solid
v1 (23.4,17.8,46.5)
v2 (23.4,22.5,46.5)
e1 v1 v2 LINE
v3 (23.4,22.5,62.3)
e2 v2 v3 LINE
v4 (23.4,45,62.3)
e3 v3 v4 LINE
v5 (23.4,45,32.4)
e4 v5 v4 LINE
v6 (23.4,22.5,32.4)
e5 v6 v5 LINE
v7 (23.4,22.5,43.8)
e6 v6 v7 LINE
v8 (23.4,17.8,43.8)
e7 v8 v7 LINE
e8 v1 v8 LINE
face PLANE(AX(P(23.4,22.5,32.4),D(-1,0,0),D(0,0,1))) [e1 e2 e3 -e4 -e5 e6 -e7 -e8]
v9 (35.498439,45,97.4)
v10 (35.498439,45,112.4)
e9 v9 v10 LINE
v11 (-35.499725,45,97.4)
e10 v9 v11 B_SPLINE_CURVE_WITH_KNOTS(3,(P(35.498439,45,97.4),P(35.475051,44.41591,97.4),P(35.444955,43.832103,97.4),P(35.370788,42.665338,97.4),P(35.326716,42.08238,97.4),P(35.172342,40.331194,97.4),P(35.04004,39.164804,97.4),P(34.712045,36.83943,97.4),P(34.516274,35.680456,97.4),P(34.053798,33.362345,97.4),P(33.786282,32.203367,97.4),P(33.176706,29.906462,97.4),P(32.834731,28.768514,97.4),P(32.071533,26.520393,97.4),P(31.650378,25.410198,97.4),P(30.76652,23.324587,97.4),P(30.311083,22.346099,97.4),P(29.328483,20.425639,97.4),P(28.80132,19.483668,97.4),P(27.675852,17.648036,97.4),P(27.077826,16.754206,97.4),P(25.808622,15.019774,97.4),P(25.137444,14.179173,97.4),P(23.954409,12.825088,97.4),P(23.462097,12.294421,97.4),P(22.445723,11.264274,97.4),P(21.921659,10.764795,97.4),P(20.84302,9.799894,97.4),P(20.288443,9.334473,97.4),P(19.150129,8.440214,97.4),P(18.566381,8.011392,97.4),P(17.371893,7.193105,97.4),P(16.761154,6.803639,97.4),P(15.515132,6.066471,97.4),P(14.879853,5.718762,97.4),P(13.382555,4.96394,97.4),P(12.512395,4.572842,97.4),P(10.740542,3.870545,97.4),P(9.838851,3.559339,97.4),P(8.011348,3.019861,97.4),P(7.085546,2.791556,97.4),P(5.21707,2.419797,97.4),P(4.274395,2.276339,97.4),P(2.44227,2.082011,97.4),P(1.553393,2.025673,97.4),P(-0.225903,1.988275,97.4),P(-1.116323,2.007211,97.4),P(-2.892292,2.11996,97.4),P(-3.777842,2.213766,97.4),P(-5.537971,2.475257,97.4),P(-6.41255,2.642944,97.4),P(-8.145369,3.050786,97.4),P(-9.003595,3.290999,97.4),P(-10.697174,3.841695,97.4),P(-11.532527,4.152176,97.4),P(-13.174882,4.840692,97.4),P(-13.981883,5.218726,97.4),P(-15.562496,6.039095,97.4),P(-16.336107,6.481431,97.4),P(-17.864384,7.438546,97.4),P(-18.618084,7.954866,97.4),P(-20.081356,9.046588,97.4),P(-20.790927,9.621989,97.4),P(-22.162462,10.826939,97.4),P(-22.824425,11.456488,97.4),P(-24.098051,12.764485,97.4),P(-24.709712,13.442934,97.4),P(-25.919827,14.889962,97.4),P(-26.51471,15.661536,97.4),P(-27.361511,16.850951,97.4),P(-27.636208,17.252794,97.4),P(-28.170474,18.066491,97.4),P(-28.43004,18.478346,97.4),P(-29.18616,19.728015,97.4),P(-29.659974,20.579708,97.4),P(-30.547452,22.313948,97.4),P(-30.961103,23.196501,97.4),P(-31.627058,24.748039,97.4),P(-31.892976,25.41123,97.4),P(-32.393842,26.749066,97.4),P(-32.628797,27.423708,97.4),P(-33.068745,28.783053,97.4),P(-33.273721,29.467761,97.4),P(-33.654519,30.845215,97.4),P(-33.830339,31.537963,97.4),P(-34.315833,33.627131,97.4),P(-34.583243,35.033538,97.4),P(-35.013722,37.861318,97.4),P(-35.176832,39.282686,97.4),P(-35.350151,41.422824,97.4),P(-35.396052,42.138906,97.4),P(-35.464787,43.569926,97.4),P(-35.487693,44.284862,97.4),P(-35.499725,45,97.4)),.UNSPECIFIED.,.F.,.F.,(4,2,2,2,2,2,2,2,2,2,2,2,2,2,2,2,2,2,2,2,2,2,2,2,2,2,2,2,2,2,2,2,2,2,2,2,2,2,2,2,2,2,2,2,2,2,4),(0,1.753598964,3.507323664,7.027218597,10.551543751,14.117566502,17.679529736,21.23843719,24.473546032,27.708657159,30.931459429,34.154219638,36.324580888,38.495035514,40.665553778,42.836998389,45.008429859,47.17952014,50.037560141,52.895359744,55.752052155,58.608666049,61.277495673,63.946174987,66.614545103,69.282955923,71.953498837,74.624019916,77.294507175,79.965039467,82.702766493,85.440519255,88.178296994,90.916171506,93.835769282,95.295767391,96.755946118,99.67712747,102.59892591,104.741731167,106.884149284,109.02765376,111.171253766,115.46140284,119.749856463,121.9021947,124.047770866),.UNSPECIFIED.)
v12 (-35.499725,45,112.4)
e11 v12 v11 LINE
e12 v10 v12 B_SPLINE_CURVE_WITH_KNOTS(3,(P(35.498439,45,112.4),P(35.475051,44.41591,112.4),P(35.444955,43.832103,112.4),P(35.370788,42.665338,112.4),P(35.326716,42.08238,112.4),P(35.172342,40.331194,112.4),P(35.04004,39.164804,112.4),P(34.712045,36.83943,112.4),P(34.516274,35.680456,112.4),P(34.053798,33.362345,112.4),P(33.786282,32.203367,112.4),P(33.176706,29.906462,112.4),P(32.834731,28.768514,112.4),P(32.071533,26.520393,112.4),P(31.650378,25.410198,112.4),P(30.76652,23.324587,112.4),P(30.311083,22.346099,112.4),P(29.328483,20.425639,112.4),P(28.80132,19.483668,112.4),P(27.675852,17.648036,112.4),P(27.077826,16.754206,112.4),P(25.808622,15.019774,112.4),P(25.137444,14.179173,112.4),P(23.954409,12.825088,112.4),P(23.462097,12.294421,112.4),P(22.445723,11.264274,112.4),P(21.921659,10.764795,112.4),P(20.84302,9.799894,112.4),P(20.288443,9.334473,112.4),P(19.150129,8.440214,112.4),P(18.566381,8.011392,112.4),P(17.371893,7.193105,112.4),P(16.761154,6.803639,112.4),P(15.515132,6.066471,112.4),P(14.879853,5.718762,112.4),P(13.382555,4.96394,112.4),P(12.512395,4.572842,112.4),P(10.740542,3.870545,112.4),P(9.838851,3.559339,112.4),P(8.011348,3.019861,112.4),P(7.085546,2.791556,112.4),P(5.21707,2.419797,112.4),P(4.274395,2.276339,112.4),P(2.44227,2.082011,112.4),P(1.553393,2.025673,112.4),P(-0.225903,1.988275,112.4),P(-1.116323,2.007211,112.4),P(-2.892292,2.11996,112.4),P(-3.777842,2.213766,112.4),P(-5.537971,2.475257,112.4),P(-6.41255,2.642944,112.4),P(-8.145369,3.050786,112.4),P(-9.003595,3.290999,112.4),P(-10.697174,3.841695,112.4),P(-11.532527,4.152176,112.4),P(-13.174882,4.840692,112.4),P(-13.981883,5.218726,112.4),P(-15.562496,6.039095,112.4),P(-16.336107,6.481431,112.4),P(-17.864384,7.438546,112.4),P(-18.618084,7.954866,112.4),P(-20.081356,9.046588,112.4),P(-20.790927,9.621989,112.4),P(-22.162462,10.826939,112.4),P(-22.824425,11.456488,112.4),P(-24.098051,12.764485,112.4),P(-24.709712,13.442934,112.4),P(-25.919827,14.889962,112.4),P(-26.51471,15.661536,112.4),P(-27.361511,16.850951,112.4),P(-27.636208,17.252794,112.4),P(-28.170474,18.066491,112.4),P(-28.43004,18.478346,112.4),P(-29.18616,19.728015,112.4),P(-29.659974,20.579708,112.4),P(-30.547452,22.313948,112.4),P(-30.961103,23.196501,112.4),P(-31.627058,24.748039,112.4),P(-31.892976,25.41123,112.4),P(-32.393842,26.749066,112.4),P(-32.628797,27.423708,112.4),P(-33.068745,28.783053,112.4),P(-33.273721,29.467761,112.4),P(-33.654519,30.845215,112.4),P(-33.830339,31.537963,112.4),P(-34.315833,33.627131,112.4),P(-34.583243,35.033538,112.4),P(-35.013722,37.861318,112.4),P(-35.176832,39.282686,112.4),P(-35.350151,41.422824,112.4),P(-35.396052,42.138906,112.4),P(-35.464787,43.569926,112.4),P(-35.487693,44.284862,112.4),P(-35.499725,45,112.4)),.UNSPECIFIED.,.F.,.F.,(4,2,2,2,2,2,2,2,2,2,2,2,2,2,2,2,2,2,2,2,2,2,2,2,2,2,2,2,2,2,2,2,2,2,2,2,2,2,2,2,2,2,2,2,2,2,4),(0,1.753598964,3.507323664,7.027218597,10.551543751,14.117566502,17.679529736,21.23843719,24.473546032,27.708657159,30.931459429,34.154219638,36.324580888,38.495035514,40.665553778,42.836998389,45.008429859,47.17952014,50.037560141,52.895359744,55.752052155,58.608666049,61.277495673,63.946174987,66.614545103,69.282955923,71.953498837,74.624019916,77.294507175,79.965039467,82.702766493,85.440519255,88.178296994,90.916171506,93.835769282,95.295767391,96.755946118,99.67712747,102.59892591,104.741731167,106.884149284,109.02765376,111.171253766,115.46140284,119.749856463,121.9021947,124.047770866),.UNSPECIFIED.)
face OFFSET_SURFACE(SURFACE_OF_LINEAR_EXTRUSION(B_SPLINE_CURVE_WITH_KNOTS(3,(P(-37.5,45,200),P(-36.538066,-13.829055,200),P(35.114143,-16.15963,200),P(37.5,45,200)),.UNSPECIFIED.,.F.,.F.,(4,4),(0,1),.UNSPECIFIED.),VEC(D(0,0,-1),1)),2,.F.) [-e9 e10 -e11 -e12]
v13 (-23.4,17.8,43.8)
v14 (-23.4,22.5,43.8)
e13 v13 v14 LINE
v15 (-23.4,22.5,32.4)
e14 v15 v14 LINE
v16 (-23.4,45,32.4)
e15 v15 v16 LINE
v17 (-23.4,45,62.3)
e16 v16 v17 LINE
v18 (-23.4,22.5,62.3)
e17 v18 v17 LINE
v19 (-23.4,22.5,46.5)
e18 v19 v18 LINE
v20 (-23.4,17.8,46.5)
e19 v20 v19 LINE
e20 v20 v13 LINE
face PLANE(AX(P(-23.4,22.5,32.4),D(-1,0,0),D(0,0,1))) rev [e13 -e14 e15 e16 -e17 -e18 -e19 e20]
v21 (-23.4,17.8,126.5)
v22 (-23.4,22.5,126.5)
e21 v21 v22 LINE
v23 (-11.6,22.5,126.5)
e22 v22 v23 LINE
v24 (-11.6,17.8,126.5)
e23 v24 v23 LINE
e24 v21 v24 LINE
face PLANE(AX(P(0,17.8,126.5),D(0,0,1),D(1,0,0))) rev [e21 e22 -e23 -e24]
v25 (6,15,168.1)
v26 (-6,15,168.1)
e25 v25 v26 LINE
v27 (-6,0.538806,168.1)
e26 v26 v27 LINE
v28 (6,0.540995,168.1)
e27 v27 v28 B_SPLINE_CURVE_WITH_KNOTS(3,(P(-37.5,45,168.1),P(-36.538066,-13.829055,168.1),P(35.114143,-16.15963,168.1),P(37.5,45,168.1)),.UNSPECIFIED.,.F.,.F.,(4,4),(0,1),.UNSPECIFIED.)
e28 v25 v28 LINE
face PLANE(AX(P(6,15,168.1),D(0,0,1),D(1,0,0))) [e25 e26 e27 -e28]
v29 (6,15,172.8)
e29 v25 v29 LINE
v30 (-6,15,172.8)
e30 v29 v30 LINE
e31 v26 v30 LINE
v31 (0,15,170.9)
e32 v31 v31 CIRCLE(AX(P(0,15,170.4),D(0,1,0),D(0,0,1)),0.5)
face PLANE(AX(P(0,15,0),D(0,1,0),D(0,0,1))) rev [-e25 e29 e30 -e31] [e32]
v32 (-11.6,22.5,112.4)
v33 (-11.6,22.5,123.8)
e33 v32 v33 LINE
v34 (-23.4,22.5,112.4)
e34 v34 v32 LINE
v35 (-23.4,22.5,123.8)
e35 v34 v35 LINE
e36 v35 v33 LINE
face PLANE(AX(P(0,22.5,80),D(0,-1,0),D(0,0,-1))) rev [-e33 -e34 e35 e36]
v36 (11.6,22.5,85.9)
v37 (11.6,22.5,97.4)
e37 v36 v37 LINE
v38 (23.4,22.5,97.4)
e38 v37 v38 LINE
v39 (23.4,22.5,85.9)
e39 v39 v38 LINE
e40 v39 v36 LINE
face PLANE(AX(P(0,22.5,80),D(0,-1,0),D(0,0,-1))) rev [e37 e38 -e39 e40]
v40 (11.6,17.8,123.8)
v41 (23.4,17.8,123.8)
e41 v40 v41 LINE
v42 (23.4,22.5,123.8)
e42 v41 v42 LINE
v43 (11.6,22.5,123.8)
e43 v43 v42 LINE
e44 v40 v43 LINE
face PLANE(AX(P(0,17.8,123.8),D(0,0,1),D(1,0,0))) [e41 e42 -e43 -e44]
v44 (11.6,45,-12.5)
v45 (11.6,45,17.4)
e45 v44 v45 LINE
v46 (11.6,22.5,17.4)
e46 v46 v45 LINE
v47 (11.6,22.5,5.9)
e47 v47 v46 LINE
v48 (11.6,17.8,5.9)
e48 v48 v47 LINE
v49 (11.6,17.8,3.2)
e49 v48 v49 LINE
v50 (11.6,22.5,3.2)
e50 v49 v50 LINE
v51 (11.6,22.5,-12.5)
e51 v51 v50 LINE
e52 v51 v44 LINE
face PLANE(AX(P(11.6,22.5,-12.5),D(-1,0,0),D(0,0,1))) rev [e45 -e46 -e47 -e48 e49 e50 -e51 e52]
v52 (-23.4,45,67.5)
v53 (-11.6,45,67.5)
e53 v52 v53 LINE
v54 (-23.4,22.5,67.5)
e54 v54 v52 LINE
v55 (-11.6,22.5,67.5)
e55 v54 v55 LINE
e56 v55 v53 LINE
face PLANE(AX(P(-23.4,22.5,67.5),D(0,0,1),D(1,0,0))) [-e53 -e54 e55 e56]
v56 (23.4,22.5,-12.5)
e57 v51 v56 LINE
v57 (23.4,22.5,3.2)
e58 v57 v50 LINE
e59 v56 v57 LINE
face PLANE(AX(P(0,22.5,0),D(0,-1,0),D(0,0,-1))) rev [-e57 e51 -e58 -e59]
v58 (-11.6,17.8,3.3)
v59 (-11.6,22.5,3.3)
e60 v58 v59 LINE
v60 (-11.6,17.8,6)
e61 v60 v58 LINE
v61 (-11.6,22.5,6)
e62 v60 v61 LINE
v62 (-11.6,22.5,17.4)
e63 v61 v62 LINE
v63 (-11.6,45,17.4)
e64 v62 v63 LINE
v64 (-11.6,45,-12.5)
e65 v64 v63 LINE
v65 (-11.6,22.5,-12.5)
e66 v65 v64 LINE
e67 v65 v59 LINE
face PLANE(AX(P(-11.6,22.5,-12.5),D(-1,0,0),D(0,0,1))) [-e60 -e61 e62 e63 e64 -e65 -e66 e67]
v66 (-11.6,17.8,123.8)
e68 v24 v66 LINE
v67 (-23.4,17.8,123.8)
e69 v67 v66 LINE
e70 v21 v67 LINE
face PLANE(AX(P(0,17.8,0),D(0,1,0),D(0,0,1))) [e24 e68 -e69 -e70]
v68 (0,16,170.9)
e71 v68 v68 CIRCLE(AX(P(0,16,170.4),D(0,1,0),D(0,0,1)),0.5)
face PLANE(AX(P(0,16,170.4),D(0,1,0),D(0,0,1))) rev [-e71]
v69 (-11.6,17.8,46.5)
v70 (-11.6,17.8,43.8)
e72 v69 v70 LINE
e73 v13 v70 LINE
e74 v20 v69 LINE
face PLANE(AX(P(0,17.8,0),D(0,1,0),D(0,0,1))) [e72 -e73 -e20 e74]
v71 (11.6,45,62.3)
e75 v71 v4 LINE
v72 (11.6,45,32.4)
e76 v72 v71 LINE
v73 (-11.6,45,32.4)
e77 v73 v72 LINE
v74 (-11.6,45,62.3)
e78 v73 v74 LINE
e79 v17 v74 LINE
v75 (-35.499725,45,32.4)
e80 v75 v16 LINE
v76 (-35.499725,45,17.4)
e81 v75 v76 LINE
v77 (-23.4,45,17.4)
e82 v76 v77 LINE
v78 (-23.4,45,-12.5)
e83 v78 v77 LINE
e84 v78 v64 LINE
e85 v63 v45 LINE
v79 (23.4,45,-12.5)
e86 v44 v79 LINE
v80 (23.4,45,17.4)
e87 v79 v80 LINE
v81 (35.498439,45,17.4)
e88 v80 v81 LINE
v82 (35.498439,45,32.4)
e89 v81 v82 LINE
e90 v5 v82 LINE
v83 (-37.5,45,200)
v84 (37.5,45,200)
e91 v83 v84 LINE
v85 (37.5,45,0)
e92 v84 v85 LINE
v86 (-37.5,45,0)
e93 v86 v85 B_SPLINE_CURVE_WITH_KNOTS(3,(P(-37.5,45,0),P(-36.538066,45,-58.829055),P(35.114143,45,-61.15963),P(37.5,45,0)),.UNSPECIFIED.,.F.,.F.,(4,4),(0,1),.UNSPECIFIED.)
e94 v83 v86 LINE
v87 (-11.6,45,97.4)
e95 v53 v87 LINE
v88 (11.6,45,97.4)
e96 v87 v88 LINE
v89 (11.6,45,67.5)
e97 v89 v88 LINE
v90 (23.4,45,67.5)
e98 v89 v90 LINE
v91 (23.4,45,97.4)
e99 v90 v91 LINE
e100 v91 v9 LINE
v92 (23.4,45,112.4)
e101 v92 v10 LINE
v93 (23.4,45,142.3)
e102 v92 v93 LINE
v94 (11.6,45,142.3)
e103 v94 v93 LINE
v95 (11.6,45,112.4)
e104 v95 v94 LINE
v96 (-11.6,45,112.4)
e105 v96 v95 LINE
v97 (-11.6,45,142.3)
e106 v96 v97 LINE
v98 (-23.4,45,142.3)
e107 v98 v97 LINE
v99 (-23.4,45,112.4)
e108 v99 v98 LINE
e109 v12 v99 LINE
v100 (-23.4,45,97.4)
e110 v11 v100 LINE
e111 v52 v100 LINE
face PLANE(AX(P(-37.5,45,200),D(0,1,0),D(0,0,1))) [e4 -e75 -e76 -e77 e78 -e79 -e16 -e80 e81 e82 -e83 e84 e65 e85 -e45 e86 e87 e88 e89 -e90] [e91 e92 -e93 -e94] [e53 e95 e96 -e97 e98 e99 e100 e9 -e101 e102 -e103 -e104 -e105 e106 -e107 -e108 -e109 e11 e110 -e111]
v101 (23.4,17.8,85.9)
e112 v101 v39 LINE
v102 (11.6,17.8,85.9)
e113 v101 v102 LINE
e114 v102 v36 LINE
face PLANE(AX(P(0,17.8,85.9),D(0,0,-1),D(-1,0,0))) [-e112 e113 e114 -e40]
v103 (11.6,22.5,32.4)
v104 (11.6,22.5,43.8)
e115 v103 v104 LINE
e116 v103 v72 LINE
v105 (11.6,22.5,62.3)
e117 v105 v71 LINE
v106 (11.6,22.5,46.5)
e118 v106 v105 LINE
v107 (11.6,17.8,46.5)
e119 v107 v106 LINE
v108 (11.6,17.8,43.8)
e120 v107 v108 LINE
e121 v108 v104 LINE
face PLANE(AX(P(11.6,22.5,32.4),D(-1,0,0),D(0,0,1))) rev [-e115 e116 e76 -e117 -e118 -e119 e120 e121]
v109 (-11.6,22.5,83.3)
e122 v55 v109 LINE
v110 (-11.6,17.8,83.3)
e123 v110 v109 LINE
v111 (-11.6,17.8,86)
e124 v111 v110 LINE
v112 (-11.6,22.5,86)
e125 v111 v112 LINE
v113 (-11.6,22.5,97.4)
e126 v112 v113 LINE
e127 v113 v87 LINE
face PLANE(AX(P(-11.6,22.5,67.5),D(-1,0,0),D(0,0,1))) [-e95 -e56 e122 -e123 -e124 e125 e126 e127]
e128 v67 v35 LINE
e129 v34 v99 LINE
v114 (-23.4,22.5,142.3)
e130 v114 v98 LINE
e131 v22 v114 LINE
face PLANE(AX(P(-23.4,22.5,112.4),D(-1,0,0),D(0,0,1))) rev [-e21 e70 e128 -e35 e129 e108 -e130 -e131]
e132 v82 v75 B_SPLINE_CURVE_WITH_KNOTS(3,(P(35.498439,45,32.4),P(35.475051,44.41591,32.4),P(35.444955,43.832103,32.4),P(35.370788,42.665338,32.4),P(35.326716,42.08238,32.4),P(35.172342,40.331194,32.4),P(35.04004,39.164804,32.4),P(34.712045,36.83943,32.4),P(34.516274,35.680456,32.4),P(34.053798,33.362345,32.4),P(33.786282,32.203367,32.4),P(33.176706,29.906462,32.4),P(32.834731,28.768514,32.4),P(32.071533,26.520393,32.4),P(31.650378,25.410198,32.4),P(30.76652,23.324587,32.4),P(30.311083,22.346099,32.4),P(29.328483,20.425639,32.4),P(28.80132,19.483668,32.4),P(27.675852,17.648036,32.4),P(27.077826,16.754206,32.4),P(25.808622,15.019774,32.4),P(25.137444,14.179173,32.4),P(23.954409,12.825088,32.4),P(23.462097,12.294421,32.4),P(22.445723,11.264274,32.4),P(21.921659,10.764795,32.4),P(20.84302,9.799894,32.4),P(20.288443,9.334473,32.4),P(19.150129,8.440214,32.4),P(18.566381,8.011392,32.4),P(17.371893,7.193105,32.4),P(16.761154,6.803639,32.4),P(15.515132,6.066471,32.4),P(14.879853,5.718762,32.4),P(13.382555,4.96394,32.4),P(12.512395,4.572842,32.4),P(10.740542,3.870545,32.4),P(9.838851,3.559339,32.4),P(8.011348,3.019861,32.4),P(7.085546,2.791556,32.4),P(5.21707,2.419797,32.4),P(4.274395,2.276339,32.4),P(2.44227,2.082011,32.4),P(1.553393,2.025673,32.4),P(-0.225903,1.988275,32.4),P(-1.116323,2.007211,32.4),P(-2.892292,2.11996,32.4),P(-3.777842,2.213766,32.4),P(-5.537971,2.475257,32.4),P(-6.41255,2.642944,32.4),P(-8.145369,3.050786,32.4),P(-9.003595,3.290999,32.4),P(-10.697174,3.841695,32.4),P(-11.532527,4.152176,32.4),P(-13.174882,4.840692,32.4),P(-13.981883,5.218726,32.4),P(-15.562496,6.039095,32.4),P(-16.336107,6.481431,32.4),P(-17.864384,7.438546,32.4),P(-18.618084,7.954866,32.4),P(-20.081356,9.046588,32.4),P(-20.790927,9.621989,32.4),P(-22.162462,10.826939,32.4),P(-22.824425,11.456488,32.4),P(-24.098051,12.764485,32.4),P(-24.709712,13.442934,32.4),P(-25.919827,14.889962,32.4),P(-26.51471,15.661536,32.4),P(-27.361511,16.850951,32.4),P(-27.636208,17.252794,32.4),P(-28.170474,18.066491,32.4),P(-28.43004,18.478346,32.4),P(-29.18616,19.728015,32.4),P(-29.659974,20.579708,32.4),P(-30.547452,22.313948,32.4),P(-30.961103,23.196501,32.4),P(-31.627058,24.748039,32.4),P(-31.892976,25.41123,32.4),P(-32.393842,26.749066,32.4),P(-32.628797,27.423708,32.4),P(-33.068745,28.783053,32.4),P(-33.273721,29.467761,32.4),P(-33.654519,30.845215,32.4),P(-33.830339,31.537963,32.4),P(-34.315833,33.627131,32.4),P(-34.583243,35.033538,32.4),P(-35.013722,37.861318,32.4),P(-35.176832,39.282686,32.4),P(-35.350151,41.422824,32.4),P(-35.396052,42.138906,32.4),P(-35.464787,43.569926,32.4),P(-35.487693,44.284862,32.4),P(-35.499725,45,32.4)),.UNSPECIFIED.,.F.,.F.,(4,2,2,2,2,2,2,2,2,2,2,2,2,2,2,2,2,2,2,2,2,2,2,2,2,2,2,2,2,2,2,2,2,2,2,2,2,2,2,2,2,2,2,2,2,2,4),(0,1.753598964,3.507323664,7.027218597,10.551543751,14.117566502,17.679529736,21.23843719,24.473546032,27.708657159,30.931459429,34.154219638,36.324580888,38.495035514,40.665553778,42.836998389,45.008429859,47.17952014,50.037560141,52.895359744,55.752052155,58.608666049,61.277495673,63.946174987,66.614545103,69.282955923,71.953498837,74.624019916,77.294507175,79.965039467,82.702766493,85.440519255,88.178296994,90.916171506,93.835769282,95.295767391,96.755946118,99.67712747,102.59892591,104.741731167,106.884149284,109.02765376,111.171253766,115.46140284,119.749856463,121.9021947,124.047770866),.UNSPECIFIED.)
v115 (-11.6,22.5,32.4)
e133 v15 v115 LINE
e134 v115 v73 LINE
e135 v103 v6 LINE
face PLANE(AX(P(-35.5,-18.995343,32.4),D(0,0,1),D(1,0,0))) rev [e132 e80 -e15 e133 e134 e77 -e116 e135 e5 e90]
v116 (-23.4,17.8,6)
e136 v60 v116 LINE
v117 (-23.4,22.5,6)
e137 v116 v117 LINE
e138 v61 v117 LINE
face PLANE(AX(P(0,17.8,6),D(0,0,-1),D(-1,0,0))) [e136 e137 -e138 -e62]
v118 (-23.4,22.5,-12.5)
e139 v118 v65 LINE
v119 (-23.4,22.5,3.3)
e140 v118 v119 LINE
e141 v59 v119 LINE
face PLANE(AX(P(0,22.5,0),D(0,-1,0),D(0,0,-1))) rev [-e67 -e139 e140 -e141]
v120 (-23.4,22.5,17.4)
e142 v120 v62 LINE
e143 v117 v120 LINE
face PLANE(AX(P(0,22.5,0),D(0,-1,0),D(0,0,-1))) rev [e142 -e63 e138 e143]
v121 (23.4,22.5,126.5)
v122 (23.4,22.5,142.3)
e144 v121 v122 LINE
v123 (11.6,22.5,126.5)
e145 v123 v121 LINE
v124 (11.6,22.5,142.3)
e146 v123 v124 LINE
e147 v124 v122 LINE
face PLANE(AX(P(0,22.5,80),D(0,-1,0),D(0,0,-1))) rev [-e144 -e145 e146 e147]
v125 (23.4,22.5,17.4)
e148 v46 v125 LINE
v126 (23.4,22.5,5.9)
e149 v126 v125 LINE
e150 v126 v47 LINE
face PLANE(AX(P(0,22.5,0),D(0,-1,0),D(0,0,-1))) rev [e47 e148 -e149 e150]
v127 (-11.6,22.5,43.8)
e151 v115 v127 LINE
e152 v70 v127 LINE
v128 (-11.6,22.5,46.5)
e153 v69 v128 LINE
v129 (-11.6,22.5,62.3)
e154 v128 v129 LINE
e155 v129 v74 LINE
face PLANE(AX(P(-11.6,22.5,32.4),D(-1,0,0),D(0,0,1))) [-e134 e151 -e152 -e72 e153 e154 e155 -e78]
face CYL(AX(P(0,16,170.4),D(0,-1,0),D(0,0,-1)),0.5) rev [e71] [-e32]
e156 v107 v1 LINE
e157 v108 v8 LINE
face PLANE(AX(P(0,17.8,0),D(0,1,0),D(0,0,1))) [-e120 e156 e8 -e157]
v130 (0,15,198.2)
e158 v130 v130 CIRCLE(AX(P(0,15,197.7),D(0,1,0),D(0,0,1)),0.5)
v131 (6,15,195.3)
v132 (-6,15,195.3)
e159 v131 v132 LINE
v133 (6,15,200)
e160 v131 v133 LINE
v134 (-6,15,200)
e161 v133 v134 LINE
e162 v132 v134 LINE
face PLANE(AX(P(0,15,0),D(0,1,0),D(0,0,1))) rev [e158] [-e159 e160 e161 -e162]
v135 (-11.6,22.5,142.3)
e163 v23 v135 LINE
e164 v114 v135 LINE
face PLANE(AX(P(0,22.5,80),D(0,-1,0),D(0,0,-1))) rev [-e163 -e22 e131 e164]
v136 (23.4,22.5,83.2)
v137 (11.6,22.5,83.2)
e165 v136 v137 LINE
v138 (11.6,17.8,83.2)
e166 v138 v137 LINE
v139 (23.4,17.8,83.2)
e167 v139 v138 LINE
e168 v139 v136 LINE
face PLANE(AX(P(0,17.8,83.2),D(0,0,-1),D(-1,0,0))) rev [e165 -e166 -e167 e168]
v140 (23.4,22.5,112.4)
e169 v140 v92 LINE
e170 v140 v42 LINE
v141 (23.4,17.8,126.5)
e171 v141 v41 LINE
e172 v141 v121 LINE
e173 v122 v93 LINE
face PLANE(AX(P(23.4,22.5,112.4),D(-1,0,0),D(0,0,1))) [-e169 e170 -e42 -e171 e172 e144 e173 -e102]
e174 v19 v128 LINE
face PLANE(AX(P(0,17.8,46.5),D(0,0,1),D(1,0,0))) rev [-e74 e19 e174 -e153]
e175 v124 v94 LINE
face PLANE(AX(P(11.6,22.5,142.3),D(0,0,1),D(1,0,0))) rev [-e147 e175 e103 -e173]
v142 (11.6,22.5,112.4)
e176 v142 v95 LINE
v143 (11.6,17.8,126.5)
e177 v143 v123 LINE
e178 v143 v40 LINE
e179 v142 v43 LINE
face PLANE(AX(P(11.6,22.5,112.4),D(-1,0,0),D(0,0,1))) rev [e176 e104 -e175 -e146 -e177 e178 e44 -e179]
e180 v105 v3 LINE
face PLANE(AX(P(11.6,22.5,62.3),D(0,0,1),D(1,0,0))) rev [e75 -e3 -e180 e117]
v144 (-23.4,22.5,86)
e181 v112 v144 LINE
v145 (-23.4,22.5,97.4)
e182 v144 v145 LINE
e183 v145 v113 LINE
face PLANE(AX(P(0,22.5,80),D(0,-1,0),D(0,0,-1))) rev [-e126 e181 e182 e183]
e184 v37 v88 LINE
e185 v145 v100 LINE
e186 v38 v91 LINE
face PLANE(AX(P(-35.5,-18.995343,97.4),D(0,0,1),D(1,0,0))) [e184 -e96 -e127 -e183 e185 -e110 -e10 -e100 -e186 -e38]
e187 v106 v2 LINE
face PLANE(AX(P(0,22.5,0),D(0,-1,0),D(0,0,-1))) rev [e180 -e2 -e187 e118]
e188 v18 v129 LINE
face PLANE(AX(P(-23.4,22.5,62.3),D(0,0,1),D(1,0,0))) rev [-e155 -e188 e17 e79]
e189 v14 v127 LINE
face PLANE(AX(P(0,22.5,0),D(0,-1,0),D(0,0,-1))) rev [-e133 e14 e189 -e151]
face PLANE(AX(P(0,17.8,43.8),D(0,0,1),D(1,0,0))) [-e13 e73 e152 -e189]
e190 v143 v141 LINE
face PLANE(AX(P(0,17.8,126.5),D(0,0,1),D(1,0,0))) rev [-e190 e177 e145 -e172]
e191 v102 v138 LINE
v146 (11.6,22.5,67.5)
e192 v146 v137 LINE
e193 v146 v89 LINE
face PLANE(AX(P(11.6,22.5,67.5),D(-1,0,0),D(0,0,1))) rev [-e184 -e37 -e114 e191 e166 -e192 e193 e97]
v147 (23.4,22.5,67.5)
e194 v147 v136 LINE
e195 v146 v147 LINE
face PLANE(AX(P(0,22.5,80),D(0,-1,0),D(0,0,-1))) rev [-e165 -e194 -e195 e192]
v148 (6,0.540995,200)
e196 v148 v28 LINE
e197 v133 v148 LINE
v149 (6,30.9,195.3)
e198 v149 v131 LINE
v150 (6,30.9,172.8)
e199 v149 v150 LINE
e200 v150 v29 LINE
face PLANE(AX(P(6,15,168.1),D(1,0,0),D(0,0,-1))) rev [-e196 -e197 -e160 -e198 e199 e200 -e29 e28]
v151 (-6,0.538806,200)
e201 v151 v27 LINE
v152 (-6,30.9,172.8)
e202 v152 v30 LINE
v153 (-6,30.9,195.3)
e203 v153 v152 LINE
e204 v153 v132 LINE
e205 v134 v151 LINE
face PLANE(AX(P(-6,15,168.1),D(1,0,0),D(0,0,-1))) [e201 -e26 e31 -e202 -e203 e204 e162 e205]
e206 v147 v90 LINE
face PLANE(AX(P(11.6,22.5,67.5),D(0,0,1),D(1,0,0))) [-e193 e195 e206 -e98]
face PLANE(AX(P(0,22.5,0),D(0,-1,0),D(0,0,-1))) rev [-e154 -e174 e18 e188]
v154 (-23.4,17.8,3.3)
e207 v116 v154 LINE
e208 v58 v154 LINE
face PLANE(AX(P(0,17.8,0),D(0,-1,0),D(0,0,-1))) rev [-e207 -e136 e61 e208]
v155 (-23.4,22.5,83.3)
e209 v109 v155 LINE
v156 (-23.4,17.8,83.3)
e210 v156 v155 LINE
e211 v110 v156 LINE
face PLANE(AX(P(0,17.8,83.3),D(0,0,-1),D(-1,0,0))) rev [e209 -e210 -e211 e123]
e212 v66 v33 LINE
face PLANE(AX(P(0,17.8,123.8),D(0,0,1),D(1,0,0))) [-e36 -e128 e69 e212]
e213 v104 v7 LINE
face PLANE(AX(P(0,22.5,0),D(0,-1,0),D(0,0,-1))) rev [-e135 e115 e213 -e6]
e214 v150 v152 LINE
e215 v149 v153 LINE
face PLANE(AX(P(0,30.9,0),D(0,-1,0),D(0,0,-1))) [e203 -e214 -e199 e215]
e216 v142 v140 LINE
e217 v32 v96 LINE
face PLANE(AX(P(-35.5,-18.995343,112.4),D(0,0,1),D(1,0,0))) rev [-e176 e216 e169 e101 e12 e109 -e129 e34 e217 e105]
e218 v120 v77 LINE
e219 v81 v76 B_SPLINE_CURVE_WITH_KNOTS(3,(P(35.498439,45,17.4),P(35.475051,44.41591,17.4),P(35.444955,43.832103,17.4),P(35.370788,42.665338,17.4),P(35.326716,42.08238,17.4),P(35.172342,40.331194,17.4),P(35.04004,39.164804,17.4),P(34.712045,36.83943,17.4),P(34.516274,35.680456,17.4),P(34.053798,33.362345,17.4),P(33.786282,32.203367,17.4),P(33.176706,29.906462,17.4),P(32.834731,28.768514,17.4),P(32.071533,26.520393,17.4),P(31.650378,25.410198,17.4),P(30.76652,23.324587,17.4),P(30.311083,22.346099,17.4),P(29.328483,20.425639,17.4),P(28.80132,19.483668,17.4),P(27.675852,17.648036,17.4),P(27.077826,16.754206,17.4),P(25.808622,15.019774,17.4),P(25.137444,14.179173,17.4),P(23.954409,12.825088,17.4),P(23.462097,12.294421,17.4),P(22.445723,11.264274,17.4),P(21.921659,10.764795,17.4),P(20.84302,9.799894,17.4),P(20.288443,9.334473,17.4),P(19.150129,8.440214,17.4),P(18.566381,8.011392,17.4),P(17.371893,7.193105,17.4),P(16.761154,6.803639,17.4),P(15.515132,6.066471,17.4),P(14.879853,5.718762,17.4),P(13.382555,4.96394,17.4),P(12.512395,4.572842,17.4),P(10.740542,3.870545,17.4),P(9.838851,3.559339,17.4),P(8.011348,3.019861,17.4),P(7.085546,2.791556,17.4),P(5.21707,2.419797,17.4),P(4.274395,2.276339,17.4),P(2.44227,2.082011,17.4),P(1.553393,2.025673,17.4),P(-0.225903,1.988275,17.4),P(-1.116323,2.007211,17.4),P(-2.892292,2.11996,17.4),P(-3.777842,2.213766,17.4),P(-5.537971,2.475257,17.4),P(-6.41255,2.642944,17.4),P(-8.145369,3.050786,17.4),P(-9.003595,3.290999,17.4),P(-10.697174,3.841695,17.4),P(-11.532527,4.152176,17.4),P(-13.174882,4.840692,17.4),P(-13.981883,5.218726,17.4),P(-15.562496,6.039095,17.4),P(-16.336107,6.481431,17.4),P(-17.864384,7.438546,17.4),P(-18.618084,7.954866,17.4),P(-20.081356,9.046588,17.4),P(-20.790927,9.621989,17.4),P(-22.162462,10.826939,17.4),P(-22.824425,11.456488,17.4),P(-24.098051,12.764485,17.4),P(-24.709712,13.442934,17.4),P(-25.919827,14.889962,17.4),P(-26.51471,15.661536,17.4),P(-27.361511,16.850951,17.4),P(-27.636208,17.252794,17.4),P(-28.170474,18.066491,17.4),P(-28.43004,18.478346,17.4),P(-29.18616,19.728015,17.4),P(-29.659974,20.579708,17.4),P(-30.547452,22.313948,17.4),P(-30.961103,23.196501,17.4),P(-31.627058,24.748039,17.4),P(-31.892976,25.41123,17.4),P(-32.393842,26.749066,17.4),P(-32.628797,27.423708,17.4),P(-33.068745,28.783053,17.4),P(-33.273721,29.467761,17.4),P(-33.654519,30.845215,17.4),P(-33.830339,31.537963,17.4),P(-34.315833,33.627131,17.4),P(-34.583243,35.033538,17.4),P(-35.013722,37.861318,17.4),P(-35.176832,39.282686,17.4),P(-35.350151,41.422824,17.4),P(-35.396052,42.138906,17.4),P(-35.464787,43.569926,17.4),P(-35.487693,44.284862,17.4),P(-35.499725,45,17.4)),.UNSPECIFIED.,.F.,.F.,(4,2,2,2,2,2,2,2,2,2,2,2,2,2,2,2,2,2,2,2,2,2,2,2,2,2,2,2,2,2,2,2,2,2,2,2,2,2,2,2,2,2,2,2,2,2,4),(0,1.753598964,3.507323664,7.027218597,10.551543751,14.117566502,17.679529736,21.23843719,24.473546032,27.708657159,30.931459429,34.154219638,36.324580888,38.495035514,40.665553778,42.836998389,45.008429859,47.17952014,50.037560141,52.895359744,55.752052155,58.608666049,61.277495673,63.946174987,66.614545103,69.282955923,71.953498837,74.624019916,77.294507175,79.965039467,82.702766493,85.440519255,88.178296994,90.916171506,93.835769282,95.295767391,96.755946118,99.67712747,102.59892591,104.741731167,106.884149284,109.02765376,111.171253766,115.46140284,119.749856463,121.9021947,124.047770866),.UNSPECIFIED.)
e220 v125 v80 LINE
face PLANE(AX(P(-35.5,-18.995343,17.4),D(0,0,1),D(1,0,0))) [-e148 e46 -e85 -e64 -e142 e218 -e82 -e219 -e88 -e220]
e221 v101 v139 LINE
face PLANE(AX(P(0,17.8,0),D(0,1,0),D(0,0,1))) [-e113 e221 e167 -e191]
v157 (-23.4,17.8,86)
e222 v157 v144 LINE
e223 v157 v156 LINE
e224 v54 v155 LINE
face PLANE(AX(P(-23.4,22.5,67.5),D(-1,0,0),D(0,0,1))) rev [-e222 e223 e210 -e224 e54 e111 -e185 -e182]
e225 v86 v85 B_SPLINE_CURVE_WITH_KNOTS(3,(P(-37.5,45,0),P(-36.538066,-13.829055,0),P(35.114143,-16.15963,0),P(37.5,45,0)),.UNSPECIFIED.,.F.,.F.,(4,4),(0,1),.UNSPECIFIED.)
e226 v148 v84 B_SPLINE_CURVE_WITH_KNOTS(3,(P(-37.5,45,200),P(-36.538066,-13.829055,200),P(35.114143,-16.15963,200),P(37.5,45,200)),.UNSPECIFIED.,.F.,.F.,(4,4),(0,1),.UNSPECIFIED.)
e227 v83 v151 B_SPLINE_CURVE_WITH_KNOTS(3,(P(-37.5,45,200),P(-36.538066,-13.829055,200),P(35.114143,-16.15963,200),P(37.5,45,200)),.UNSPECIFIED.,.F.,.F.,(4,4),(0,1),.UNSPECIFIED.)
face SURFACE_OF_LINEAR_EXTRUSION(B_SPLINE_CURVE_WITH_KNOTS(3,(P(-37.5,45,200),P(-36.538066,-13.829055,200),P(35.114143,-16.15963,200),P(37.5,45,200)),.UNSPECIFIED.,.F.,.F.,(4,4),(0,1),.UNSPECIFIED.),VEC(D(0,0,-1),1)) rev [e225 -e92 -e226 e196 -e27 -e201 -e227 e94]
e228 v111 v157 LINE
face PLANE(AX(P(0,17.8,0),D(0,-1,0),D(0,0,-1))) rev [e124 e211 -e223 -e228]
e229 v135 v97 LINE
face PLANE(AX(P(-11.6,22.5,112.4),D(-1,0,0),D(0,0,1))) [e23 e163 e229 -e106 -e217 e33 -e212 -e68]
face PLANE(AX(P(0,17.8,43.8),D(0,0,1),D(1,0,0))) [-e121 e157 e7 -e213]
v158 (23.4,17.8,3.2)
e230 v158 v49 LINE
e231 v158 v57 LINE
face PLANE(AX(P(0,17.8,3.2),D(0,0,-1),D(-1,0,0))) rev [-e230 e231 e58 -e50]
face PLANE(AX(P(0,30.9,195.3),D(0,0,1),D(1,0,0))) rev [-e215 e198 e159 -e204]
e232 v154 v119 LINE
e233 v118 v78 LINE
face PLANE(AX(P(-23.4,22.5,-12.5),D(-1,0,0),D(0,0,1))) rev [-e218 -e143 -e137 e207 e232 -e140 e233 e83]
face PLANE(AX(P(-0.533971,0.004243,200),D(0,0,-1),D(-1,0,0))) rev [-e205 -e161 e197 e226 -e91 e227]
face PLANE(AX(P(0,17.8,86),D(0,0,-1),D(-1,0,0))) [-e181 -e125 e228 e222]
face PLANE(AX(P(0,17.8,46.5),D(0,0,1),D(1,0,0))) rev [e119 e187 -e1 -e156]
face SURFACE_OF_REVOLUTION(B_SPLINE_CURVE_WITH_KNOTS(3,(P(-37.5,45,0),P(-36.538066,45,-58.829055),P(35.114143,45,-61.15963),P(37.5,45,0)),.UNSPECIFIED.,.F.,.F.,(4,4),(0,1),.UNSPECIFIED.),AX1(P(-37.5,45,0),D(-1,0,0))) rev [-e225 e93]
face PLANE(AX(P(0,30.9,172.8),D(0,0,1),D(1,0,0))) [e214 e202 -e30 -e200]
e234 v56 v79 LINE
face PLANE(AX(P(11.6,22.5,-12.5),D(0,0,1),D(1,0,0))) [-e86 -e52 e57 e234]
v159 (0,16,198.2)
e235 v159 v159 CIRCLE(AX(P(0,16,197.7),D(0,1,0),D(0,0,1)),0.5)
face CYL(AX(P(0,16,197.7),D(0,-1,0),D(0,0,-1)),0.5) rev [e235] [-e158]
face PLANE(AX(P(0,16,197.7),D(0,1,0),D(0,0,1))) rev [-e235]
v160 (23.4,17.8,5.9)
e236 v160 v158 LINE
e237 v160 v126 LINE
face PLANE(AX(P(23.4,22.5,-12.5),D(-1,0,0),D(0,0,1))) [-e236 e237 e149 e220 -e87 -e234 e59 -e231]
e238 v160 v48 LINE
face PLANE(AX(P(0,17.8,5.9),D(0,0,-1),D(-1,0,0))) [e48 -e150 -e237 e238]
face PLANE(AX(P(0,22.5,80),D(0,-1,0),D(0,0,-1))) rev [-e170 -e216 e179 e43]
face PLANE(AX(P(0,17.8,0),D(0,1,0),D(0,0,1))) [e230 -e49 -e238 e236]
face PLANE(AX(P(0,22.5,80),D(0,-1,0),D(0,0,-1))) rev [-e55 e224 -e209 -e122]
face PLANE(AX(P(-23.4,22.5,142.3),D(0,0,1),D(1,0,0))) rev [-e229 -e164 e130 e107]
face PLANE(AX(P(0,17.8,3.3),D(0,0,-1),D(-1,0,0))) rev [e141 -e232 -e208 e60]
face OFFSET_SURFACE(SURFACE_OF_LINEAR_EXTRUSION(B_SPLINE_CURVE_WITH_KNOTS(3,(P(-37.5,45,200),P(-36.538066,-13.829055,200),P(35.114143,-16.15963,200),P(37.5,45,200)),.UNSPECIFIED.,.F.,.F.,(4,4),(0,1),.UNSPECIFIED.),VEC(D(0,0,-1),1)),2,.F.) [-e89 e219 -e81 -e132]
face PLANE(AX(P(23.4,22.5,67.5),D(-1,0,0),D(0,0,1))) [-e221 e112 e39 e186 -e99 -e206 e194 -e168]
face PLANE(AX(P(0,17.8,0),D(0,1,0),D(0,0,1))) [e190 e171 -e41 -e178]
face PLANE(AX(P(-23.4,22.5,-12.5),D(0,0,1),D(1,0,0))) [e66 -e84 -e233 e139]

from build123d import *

# Parameters (mm, degrees)
BOSS_EXTRUDE1_DEPTH = 200
REVOLVE1_ANGLE      = 90
SKETCH7_W           = 11.8
SKETCH7_H           = 29.9
CUT_EXTRUDE1_DEPTH  = 22.5
CUT_EXTRUDE2_START  = 17.4
CUT_EXTRUDE2_DEPTH  = 15
CUT_EXTRUDE3_START  = -22.5
SKETCH7_4_W         = 11.8
SKETCH7_4_H         = 2.7
CUT_EXTRUDE3_DEPTH  = 4.7
LPATTERN1_COUNT     = 2
LPATTERN1_PITCH     = 80
CUT_EXTRUDE4_START  = -45
SKETCH9_W           = 12
SKETCH9_H           = 31.9
CUT_EXTRUDE4_DEPTH  = 15
CUT_EXTRUDE5_START  = -30
SKETCH9_3_W         = 12
SKETCH9_3_H         = 22.5
CUT_EXTRUDE5_DEPTH  = 15.9
CUT_EXTRUDE7_START  = -30
SKETCH9_4_R         = 0.5
CUT_EXTRUDE7_DEPTH  = 1


# Read off the part's stored shape, not the designer's step: Cut-Extrude2
with BuildPart() as part:
    # Sketch1 → Boss-Extrude1 (new body)
    with BuildSketch(Plane.XY):
        with BuildLine():
            Line((-37.5, 45), (37.5, 45))
            add(Edge.make_bspline(
                [(-37.5, 45), (-36.538066416, -13.829055166), (35.114143496, -16.15963011), (37.5, 45)],
                knots=[0, 0, 0, 0, 1, 1, 1, 1], degree=3))
        make_face()
    extrude(amount=BOSS_EXTRUDE1_DEPTH)

    # Sketch1<2> → Revolve1 (revolve)
    with BuildSketch(Plane.XY):
        with BuildLine():
            Line((37.5, 45), (-37.5, 45))
            add(Edge.make_bspline(
                [(-37.5, 45), (-36.538066416, -13.829055166), (35.114143496, -16.15963011), (37.5, 45)],
                knots=[0, 0, 0, 0, 1, 1, 1, 1], degree=3))
        make_face()
    revolve(axis=Axis((-37.5, 45, 0), (1, 0, 0)), revolution_arc=REVOLVE1_ANGLE)

    # Sketch7 → Cut-Extrude1 (cut)
    with BuildSketch(Plane(origin=(0, 45, 0), x_dir=(1, 0, 0), z_dir=(0, 1, 0))):
        with Locations((-17.5, -2.45)):
            Rectangle(SKETCH7_W, SKETCH7_H)
        with Locations((17.5, -2.45)):
            Rectangle(SKETCH7_W, SKETCH7_H)
        with Locations((-17.5, -47.35)):
            Rectangle(SKETCH7_W, SKETCH7_H)
        with Locations((17.5, -47.35)):
            Rectangle(SKETCH7_W, SKETCH7_H)
    cut_extrude1 = extrude(amount=-CUT_EXTRUDE1_DEPTH, mode=Mode.SUBTRACT)

    # Cut-Extrude2 outline → Cut-Extrude2 (cut)
    with BuildSketch(Plane.XY.offset(CUT_EXTRUDE2_START)):
        with BuildLine():
            Line((35.498438873, 45), (-35.499725066, 45))
            add(Edge.make_bspline(
                [(-35.499725066, 45), (-35.368650609, 37.205082169), (-34.301979481, 30.199561306), (-32.413613618, 23.984635954), (-29.817810175, 18.556811549), (-26.625334767, 13.909452625), (-22.944999564, 10.026846468), (-18.86488359, 6.899280201), (-14.482583961, 4.530449937), (-9.895330776, 2.922239991), (-5.202441131, 2.078686183), (4.195747969, 1.92933157), (8.901042205, 2.622767579), (13.515468258, 4.088792702), (17.941749121, 6.331594499), (22.084774291, 9.360328131), (25.852428778, 13.179838208), (29.158791013, 17.820930982), (31.88915848, 23.308583975), (33.93262988, 29.659944885), (35.173667519, 36.887661716), (35.498438873, 45)],
                knots=[0.000190564, 0.000190564, 0.000190564, 0.000190564, 0.000190564, 0.000190564, 0.000190564, 0.000190564, 0.000190564, 0.000190564, 0.000190564, 0.000190564, 0.5, 0.5, 0.5, 0.5, 0.5, 0.5, 0.5, 0.5, 0.5, 0.5, 0.999563761, 0.999563761, 0.999563761, 0.999563761, 0.999563761, 0.999563761, 0.999563761, 0.999563761, 0.999563761, 0.999563761, 0.999563761, 0.999563761], degree=11))
        make_face()
    cut_extrude2 = extrude(amount=CUT_EXTRUDE2_DEPTH, mode=Mode.SUBTRACT)

    # Sketch7<4> → Cut-Extrude3 (cut)
    with BuildSketch(Plane(origin=(0, 45, 0), x_dir=(1, 0, 0), z_dir=(0, 1, 0)).offset(CUT_EXTRUDE3_START)):
        with Locations((-17.5, -4.65)):
            Rectangle(SKETCH7_4_W, SKETCH7_4_H)
        with Locations((17.5, -4.55)):
            Rectangle(SKETCH7_4_W, SKETCH7_4_H)
        with Locations((17.5, -45.15)):
            Rectangle(SKETCH7_4_W, SKETCH7_4_H)
        with Locations((-17.5, -45.15)):
            Rectangle(SKETCH7_4_W, SKETCH7_4_H)
    cut_extrude3 = extrude(amount=-CUT_EXTRUDE3_DEPTH, mode=Mode.SUBTRACT)

    # LPattern1: Cut-Extrude1, Cut-Extrude2, Cut-Extrude3 ×2
    with Locations(*[(0, 0, i * LPATTERN1_PITCH) for i in range(1, LPATTERN1_COUNT)]):
        add(cut_extrude1, mode=Mode.SUBTRACT)
        add(cut_extrude2, mode=Mode.SUBTRACT)
        add(cut_extrude3, mode=Mode.SUBTRACT)

    # Sketch9 → Cut-Extrude4 (cut)
    with BuildSketch(Plane(origin=(0, 45, 0), x_dir=(1, 0, 0), z_dir=(0, 1, 0)).offset(CUT_EXTRUDE4_START)):
        with Locations((0, -184.05)):
            Rectangle(SKETCH9_W, SKETCH9_H)
    extrude(amount=CUT_EXTRUDE4_DEPTH, mode=Mode.SUBTRACT)

    # Sketch9<3> → Cut-Extrude5 (cut)
    with BuildSketch(Plane(origin=(0, 45, 0), x_dir=(1, 0, 0), z_dir=(0, 1, 0)).offset(CUT_EXTRUDE5_START)):
        with Locations((0, -184.05)):
            Rectangle(SKETCH9_3_W, SKETCH9_3_H)
    extrude(amount=CUT_EXTRUDE5_DEPTH, mode=Mode.SUBTRACT)

    # Sketch9<4> → Cut-Extrude7 (cut)
    with BuildSketch(Plane(origin=(0, 45, 0), x_dir=(1, 0, 0), z_dir=(0, 1, 0)).offset(CUT_EXTRUDE7_START)):
        with Locations(Location((0, -170.4, 0), (0, 0, 270))):
            Circle(SKETCH9_4_R)
        with Locations(Location((0, -197.7, 0), (0, 0, 270))):
            Circle(SKETCH9_4_R)
    extrude(amount=CUT_EXTRUDE7_DEPTH, mode=Mode.SUBTRACT)


solid = part.part
